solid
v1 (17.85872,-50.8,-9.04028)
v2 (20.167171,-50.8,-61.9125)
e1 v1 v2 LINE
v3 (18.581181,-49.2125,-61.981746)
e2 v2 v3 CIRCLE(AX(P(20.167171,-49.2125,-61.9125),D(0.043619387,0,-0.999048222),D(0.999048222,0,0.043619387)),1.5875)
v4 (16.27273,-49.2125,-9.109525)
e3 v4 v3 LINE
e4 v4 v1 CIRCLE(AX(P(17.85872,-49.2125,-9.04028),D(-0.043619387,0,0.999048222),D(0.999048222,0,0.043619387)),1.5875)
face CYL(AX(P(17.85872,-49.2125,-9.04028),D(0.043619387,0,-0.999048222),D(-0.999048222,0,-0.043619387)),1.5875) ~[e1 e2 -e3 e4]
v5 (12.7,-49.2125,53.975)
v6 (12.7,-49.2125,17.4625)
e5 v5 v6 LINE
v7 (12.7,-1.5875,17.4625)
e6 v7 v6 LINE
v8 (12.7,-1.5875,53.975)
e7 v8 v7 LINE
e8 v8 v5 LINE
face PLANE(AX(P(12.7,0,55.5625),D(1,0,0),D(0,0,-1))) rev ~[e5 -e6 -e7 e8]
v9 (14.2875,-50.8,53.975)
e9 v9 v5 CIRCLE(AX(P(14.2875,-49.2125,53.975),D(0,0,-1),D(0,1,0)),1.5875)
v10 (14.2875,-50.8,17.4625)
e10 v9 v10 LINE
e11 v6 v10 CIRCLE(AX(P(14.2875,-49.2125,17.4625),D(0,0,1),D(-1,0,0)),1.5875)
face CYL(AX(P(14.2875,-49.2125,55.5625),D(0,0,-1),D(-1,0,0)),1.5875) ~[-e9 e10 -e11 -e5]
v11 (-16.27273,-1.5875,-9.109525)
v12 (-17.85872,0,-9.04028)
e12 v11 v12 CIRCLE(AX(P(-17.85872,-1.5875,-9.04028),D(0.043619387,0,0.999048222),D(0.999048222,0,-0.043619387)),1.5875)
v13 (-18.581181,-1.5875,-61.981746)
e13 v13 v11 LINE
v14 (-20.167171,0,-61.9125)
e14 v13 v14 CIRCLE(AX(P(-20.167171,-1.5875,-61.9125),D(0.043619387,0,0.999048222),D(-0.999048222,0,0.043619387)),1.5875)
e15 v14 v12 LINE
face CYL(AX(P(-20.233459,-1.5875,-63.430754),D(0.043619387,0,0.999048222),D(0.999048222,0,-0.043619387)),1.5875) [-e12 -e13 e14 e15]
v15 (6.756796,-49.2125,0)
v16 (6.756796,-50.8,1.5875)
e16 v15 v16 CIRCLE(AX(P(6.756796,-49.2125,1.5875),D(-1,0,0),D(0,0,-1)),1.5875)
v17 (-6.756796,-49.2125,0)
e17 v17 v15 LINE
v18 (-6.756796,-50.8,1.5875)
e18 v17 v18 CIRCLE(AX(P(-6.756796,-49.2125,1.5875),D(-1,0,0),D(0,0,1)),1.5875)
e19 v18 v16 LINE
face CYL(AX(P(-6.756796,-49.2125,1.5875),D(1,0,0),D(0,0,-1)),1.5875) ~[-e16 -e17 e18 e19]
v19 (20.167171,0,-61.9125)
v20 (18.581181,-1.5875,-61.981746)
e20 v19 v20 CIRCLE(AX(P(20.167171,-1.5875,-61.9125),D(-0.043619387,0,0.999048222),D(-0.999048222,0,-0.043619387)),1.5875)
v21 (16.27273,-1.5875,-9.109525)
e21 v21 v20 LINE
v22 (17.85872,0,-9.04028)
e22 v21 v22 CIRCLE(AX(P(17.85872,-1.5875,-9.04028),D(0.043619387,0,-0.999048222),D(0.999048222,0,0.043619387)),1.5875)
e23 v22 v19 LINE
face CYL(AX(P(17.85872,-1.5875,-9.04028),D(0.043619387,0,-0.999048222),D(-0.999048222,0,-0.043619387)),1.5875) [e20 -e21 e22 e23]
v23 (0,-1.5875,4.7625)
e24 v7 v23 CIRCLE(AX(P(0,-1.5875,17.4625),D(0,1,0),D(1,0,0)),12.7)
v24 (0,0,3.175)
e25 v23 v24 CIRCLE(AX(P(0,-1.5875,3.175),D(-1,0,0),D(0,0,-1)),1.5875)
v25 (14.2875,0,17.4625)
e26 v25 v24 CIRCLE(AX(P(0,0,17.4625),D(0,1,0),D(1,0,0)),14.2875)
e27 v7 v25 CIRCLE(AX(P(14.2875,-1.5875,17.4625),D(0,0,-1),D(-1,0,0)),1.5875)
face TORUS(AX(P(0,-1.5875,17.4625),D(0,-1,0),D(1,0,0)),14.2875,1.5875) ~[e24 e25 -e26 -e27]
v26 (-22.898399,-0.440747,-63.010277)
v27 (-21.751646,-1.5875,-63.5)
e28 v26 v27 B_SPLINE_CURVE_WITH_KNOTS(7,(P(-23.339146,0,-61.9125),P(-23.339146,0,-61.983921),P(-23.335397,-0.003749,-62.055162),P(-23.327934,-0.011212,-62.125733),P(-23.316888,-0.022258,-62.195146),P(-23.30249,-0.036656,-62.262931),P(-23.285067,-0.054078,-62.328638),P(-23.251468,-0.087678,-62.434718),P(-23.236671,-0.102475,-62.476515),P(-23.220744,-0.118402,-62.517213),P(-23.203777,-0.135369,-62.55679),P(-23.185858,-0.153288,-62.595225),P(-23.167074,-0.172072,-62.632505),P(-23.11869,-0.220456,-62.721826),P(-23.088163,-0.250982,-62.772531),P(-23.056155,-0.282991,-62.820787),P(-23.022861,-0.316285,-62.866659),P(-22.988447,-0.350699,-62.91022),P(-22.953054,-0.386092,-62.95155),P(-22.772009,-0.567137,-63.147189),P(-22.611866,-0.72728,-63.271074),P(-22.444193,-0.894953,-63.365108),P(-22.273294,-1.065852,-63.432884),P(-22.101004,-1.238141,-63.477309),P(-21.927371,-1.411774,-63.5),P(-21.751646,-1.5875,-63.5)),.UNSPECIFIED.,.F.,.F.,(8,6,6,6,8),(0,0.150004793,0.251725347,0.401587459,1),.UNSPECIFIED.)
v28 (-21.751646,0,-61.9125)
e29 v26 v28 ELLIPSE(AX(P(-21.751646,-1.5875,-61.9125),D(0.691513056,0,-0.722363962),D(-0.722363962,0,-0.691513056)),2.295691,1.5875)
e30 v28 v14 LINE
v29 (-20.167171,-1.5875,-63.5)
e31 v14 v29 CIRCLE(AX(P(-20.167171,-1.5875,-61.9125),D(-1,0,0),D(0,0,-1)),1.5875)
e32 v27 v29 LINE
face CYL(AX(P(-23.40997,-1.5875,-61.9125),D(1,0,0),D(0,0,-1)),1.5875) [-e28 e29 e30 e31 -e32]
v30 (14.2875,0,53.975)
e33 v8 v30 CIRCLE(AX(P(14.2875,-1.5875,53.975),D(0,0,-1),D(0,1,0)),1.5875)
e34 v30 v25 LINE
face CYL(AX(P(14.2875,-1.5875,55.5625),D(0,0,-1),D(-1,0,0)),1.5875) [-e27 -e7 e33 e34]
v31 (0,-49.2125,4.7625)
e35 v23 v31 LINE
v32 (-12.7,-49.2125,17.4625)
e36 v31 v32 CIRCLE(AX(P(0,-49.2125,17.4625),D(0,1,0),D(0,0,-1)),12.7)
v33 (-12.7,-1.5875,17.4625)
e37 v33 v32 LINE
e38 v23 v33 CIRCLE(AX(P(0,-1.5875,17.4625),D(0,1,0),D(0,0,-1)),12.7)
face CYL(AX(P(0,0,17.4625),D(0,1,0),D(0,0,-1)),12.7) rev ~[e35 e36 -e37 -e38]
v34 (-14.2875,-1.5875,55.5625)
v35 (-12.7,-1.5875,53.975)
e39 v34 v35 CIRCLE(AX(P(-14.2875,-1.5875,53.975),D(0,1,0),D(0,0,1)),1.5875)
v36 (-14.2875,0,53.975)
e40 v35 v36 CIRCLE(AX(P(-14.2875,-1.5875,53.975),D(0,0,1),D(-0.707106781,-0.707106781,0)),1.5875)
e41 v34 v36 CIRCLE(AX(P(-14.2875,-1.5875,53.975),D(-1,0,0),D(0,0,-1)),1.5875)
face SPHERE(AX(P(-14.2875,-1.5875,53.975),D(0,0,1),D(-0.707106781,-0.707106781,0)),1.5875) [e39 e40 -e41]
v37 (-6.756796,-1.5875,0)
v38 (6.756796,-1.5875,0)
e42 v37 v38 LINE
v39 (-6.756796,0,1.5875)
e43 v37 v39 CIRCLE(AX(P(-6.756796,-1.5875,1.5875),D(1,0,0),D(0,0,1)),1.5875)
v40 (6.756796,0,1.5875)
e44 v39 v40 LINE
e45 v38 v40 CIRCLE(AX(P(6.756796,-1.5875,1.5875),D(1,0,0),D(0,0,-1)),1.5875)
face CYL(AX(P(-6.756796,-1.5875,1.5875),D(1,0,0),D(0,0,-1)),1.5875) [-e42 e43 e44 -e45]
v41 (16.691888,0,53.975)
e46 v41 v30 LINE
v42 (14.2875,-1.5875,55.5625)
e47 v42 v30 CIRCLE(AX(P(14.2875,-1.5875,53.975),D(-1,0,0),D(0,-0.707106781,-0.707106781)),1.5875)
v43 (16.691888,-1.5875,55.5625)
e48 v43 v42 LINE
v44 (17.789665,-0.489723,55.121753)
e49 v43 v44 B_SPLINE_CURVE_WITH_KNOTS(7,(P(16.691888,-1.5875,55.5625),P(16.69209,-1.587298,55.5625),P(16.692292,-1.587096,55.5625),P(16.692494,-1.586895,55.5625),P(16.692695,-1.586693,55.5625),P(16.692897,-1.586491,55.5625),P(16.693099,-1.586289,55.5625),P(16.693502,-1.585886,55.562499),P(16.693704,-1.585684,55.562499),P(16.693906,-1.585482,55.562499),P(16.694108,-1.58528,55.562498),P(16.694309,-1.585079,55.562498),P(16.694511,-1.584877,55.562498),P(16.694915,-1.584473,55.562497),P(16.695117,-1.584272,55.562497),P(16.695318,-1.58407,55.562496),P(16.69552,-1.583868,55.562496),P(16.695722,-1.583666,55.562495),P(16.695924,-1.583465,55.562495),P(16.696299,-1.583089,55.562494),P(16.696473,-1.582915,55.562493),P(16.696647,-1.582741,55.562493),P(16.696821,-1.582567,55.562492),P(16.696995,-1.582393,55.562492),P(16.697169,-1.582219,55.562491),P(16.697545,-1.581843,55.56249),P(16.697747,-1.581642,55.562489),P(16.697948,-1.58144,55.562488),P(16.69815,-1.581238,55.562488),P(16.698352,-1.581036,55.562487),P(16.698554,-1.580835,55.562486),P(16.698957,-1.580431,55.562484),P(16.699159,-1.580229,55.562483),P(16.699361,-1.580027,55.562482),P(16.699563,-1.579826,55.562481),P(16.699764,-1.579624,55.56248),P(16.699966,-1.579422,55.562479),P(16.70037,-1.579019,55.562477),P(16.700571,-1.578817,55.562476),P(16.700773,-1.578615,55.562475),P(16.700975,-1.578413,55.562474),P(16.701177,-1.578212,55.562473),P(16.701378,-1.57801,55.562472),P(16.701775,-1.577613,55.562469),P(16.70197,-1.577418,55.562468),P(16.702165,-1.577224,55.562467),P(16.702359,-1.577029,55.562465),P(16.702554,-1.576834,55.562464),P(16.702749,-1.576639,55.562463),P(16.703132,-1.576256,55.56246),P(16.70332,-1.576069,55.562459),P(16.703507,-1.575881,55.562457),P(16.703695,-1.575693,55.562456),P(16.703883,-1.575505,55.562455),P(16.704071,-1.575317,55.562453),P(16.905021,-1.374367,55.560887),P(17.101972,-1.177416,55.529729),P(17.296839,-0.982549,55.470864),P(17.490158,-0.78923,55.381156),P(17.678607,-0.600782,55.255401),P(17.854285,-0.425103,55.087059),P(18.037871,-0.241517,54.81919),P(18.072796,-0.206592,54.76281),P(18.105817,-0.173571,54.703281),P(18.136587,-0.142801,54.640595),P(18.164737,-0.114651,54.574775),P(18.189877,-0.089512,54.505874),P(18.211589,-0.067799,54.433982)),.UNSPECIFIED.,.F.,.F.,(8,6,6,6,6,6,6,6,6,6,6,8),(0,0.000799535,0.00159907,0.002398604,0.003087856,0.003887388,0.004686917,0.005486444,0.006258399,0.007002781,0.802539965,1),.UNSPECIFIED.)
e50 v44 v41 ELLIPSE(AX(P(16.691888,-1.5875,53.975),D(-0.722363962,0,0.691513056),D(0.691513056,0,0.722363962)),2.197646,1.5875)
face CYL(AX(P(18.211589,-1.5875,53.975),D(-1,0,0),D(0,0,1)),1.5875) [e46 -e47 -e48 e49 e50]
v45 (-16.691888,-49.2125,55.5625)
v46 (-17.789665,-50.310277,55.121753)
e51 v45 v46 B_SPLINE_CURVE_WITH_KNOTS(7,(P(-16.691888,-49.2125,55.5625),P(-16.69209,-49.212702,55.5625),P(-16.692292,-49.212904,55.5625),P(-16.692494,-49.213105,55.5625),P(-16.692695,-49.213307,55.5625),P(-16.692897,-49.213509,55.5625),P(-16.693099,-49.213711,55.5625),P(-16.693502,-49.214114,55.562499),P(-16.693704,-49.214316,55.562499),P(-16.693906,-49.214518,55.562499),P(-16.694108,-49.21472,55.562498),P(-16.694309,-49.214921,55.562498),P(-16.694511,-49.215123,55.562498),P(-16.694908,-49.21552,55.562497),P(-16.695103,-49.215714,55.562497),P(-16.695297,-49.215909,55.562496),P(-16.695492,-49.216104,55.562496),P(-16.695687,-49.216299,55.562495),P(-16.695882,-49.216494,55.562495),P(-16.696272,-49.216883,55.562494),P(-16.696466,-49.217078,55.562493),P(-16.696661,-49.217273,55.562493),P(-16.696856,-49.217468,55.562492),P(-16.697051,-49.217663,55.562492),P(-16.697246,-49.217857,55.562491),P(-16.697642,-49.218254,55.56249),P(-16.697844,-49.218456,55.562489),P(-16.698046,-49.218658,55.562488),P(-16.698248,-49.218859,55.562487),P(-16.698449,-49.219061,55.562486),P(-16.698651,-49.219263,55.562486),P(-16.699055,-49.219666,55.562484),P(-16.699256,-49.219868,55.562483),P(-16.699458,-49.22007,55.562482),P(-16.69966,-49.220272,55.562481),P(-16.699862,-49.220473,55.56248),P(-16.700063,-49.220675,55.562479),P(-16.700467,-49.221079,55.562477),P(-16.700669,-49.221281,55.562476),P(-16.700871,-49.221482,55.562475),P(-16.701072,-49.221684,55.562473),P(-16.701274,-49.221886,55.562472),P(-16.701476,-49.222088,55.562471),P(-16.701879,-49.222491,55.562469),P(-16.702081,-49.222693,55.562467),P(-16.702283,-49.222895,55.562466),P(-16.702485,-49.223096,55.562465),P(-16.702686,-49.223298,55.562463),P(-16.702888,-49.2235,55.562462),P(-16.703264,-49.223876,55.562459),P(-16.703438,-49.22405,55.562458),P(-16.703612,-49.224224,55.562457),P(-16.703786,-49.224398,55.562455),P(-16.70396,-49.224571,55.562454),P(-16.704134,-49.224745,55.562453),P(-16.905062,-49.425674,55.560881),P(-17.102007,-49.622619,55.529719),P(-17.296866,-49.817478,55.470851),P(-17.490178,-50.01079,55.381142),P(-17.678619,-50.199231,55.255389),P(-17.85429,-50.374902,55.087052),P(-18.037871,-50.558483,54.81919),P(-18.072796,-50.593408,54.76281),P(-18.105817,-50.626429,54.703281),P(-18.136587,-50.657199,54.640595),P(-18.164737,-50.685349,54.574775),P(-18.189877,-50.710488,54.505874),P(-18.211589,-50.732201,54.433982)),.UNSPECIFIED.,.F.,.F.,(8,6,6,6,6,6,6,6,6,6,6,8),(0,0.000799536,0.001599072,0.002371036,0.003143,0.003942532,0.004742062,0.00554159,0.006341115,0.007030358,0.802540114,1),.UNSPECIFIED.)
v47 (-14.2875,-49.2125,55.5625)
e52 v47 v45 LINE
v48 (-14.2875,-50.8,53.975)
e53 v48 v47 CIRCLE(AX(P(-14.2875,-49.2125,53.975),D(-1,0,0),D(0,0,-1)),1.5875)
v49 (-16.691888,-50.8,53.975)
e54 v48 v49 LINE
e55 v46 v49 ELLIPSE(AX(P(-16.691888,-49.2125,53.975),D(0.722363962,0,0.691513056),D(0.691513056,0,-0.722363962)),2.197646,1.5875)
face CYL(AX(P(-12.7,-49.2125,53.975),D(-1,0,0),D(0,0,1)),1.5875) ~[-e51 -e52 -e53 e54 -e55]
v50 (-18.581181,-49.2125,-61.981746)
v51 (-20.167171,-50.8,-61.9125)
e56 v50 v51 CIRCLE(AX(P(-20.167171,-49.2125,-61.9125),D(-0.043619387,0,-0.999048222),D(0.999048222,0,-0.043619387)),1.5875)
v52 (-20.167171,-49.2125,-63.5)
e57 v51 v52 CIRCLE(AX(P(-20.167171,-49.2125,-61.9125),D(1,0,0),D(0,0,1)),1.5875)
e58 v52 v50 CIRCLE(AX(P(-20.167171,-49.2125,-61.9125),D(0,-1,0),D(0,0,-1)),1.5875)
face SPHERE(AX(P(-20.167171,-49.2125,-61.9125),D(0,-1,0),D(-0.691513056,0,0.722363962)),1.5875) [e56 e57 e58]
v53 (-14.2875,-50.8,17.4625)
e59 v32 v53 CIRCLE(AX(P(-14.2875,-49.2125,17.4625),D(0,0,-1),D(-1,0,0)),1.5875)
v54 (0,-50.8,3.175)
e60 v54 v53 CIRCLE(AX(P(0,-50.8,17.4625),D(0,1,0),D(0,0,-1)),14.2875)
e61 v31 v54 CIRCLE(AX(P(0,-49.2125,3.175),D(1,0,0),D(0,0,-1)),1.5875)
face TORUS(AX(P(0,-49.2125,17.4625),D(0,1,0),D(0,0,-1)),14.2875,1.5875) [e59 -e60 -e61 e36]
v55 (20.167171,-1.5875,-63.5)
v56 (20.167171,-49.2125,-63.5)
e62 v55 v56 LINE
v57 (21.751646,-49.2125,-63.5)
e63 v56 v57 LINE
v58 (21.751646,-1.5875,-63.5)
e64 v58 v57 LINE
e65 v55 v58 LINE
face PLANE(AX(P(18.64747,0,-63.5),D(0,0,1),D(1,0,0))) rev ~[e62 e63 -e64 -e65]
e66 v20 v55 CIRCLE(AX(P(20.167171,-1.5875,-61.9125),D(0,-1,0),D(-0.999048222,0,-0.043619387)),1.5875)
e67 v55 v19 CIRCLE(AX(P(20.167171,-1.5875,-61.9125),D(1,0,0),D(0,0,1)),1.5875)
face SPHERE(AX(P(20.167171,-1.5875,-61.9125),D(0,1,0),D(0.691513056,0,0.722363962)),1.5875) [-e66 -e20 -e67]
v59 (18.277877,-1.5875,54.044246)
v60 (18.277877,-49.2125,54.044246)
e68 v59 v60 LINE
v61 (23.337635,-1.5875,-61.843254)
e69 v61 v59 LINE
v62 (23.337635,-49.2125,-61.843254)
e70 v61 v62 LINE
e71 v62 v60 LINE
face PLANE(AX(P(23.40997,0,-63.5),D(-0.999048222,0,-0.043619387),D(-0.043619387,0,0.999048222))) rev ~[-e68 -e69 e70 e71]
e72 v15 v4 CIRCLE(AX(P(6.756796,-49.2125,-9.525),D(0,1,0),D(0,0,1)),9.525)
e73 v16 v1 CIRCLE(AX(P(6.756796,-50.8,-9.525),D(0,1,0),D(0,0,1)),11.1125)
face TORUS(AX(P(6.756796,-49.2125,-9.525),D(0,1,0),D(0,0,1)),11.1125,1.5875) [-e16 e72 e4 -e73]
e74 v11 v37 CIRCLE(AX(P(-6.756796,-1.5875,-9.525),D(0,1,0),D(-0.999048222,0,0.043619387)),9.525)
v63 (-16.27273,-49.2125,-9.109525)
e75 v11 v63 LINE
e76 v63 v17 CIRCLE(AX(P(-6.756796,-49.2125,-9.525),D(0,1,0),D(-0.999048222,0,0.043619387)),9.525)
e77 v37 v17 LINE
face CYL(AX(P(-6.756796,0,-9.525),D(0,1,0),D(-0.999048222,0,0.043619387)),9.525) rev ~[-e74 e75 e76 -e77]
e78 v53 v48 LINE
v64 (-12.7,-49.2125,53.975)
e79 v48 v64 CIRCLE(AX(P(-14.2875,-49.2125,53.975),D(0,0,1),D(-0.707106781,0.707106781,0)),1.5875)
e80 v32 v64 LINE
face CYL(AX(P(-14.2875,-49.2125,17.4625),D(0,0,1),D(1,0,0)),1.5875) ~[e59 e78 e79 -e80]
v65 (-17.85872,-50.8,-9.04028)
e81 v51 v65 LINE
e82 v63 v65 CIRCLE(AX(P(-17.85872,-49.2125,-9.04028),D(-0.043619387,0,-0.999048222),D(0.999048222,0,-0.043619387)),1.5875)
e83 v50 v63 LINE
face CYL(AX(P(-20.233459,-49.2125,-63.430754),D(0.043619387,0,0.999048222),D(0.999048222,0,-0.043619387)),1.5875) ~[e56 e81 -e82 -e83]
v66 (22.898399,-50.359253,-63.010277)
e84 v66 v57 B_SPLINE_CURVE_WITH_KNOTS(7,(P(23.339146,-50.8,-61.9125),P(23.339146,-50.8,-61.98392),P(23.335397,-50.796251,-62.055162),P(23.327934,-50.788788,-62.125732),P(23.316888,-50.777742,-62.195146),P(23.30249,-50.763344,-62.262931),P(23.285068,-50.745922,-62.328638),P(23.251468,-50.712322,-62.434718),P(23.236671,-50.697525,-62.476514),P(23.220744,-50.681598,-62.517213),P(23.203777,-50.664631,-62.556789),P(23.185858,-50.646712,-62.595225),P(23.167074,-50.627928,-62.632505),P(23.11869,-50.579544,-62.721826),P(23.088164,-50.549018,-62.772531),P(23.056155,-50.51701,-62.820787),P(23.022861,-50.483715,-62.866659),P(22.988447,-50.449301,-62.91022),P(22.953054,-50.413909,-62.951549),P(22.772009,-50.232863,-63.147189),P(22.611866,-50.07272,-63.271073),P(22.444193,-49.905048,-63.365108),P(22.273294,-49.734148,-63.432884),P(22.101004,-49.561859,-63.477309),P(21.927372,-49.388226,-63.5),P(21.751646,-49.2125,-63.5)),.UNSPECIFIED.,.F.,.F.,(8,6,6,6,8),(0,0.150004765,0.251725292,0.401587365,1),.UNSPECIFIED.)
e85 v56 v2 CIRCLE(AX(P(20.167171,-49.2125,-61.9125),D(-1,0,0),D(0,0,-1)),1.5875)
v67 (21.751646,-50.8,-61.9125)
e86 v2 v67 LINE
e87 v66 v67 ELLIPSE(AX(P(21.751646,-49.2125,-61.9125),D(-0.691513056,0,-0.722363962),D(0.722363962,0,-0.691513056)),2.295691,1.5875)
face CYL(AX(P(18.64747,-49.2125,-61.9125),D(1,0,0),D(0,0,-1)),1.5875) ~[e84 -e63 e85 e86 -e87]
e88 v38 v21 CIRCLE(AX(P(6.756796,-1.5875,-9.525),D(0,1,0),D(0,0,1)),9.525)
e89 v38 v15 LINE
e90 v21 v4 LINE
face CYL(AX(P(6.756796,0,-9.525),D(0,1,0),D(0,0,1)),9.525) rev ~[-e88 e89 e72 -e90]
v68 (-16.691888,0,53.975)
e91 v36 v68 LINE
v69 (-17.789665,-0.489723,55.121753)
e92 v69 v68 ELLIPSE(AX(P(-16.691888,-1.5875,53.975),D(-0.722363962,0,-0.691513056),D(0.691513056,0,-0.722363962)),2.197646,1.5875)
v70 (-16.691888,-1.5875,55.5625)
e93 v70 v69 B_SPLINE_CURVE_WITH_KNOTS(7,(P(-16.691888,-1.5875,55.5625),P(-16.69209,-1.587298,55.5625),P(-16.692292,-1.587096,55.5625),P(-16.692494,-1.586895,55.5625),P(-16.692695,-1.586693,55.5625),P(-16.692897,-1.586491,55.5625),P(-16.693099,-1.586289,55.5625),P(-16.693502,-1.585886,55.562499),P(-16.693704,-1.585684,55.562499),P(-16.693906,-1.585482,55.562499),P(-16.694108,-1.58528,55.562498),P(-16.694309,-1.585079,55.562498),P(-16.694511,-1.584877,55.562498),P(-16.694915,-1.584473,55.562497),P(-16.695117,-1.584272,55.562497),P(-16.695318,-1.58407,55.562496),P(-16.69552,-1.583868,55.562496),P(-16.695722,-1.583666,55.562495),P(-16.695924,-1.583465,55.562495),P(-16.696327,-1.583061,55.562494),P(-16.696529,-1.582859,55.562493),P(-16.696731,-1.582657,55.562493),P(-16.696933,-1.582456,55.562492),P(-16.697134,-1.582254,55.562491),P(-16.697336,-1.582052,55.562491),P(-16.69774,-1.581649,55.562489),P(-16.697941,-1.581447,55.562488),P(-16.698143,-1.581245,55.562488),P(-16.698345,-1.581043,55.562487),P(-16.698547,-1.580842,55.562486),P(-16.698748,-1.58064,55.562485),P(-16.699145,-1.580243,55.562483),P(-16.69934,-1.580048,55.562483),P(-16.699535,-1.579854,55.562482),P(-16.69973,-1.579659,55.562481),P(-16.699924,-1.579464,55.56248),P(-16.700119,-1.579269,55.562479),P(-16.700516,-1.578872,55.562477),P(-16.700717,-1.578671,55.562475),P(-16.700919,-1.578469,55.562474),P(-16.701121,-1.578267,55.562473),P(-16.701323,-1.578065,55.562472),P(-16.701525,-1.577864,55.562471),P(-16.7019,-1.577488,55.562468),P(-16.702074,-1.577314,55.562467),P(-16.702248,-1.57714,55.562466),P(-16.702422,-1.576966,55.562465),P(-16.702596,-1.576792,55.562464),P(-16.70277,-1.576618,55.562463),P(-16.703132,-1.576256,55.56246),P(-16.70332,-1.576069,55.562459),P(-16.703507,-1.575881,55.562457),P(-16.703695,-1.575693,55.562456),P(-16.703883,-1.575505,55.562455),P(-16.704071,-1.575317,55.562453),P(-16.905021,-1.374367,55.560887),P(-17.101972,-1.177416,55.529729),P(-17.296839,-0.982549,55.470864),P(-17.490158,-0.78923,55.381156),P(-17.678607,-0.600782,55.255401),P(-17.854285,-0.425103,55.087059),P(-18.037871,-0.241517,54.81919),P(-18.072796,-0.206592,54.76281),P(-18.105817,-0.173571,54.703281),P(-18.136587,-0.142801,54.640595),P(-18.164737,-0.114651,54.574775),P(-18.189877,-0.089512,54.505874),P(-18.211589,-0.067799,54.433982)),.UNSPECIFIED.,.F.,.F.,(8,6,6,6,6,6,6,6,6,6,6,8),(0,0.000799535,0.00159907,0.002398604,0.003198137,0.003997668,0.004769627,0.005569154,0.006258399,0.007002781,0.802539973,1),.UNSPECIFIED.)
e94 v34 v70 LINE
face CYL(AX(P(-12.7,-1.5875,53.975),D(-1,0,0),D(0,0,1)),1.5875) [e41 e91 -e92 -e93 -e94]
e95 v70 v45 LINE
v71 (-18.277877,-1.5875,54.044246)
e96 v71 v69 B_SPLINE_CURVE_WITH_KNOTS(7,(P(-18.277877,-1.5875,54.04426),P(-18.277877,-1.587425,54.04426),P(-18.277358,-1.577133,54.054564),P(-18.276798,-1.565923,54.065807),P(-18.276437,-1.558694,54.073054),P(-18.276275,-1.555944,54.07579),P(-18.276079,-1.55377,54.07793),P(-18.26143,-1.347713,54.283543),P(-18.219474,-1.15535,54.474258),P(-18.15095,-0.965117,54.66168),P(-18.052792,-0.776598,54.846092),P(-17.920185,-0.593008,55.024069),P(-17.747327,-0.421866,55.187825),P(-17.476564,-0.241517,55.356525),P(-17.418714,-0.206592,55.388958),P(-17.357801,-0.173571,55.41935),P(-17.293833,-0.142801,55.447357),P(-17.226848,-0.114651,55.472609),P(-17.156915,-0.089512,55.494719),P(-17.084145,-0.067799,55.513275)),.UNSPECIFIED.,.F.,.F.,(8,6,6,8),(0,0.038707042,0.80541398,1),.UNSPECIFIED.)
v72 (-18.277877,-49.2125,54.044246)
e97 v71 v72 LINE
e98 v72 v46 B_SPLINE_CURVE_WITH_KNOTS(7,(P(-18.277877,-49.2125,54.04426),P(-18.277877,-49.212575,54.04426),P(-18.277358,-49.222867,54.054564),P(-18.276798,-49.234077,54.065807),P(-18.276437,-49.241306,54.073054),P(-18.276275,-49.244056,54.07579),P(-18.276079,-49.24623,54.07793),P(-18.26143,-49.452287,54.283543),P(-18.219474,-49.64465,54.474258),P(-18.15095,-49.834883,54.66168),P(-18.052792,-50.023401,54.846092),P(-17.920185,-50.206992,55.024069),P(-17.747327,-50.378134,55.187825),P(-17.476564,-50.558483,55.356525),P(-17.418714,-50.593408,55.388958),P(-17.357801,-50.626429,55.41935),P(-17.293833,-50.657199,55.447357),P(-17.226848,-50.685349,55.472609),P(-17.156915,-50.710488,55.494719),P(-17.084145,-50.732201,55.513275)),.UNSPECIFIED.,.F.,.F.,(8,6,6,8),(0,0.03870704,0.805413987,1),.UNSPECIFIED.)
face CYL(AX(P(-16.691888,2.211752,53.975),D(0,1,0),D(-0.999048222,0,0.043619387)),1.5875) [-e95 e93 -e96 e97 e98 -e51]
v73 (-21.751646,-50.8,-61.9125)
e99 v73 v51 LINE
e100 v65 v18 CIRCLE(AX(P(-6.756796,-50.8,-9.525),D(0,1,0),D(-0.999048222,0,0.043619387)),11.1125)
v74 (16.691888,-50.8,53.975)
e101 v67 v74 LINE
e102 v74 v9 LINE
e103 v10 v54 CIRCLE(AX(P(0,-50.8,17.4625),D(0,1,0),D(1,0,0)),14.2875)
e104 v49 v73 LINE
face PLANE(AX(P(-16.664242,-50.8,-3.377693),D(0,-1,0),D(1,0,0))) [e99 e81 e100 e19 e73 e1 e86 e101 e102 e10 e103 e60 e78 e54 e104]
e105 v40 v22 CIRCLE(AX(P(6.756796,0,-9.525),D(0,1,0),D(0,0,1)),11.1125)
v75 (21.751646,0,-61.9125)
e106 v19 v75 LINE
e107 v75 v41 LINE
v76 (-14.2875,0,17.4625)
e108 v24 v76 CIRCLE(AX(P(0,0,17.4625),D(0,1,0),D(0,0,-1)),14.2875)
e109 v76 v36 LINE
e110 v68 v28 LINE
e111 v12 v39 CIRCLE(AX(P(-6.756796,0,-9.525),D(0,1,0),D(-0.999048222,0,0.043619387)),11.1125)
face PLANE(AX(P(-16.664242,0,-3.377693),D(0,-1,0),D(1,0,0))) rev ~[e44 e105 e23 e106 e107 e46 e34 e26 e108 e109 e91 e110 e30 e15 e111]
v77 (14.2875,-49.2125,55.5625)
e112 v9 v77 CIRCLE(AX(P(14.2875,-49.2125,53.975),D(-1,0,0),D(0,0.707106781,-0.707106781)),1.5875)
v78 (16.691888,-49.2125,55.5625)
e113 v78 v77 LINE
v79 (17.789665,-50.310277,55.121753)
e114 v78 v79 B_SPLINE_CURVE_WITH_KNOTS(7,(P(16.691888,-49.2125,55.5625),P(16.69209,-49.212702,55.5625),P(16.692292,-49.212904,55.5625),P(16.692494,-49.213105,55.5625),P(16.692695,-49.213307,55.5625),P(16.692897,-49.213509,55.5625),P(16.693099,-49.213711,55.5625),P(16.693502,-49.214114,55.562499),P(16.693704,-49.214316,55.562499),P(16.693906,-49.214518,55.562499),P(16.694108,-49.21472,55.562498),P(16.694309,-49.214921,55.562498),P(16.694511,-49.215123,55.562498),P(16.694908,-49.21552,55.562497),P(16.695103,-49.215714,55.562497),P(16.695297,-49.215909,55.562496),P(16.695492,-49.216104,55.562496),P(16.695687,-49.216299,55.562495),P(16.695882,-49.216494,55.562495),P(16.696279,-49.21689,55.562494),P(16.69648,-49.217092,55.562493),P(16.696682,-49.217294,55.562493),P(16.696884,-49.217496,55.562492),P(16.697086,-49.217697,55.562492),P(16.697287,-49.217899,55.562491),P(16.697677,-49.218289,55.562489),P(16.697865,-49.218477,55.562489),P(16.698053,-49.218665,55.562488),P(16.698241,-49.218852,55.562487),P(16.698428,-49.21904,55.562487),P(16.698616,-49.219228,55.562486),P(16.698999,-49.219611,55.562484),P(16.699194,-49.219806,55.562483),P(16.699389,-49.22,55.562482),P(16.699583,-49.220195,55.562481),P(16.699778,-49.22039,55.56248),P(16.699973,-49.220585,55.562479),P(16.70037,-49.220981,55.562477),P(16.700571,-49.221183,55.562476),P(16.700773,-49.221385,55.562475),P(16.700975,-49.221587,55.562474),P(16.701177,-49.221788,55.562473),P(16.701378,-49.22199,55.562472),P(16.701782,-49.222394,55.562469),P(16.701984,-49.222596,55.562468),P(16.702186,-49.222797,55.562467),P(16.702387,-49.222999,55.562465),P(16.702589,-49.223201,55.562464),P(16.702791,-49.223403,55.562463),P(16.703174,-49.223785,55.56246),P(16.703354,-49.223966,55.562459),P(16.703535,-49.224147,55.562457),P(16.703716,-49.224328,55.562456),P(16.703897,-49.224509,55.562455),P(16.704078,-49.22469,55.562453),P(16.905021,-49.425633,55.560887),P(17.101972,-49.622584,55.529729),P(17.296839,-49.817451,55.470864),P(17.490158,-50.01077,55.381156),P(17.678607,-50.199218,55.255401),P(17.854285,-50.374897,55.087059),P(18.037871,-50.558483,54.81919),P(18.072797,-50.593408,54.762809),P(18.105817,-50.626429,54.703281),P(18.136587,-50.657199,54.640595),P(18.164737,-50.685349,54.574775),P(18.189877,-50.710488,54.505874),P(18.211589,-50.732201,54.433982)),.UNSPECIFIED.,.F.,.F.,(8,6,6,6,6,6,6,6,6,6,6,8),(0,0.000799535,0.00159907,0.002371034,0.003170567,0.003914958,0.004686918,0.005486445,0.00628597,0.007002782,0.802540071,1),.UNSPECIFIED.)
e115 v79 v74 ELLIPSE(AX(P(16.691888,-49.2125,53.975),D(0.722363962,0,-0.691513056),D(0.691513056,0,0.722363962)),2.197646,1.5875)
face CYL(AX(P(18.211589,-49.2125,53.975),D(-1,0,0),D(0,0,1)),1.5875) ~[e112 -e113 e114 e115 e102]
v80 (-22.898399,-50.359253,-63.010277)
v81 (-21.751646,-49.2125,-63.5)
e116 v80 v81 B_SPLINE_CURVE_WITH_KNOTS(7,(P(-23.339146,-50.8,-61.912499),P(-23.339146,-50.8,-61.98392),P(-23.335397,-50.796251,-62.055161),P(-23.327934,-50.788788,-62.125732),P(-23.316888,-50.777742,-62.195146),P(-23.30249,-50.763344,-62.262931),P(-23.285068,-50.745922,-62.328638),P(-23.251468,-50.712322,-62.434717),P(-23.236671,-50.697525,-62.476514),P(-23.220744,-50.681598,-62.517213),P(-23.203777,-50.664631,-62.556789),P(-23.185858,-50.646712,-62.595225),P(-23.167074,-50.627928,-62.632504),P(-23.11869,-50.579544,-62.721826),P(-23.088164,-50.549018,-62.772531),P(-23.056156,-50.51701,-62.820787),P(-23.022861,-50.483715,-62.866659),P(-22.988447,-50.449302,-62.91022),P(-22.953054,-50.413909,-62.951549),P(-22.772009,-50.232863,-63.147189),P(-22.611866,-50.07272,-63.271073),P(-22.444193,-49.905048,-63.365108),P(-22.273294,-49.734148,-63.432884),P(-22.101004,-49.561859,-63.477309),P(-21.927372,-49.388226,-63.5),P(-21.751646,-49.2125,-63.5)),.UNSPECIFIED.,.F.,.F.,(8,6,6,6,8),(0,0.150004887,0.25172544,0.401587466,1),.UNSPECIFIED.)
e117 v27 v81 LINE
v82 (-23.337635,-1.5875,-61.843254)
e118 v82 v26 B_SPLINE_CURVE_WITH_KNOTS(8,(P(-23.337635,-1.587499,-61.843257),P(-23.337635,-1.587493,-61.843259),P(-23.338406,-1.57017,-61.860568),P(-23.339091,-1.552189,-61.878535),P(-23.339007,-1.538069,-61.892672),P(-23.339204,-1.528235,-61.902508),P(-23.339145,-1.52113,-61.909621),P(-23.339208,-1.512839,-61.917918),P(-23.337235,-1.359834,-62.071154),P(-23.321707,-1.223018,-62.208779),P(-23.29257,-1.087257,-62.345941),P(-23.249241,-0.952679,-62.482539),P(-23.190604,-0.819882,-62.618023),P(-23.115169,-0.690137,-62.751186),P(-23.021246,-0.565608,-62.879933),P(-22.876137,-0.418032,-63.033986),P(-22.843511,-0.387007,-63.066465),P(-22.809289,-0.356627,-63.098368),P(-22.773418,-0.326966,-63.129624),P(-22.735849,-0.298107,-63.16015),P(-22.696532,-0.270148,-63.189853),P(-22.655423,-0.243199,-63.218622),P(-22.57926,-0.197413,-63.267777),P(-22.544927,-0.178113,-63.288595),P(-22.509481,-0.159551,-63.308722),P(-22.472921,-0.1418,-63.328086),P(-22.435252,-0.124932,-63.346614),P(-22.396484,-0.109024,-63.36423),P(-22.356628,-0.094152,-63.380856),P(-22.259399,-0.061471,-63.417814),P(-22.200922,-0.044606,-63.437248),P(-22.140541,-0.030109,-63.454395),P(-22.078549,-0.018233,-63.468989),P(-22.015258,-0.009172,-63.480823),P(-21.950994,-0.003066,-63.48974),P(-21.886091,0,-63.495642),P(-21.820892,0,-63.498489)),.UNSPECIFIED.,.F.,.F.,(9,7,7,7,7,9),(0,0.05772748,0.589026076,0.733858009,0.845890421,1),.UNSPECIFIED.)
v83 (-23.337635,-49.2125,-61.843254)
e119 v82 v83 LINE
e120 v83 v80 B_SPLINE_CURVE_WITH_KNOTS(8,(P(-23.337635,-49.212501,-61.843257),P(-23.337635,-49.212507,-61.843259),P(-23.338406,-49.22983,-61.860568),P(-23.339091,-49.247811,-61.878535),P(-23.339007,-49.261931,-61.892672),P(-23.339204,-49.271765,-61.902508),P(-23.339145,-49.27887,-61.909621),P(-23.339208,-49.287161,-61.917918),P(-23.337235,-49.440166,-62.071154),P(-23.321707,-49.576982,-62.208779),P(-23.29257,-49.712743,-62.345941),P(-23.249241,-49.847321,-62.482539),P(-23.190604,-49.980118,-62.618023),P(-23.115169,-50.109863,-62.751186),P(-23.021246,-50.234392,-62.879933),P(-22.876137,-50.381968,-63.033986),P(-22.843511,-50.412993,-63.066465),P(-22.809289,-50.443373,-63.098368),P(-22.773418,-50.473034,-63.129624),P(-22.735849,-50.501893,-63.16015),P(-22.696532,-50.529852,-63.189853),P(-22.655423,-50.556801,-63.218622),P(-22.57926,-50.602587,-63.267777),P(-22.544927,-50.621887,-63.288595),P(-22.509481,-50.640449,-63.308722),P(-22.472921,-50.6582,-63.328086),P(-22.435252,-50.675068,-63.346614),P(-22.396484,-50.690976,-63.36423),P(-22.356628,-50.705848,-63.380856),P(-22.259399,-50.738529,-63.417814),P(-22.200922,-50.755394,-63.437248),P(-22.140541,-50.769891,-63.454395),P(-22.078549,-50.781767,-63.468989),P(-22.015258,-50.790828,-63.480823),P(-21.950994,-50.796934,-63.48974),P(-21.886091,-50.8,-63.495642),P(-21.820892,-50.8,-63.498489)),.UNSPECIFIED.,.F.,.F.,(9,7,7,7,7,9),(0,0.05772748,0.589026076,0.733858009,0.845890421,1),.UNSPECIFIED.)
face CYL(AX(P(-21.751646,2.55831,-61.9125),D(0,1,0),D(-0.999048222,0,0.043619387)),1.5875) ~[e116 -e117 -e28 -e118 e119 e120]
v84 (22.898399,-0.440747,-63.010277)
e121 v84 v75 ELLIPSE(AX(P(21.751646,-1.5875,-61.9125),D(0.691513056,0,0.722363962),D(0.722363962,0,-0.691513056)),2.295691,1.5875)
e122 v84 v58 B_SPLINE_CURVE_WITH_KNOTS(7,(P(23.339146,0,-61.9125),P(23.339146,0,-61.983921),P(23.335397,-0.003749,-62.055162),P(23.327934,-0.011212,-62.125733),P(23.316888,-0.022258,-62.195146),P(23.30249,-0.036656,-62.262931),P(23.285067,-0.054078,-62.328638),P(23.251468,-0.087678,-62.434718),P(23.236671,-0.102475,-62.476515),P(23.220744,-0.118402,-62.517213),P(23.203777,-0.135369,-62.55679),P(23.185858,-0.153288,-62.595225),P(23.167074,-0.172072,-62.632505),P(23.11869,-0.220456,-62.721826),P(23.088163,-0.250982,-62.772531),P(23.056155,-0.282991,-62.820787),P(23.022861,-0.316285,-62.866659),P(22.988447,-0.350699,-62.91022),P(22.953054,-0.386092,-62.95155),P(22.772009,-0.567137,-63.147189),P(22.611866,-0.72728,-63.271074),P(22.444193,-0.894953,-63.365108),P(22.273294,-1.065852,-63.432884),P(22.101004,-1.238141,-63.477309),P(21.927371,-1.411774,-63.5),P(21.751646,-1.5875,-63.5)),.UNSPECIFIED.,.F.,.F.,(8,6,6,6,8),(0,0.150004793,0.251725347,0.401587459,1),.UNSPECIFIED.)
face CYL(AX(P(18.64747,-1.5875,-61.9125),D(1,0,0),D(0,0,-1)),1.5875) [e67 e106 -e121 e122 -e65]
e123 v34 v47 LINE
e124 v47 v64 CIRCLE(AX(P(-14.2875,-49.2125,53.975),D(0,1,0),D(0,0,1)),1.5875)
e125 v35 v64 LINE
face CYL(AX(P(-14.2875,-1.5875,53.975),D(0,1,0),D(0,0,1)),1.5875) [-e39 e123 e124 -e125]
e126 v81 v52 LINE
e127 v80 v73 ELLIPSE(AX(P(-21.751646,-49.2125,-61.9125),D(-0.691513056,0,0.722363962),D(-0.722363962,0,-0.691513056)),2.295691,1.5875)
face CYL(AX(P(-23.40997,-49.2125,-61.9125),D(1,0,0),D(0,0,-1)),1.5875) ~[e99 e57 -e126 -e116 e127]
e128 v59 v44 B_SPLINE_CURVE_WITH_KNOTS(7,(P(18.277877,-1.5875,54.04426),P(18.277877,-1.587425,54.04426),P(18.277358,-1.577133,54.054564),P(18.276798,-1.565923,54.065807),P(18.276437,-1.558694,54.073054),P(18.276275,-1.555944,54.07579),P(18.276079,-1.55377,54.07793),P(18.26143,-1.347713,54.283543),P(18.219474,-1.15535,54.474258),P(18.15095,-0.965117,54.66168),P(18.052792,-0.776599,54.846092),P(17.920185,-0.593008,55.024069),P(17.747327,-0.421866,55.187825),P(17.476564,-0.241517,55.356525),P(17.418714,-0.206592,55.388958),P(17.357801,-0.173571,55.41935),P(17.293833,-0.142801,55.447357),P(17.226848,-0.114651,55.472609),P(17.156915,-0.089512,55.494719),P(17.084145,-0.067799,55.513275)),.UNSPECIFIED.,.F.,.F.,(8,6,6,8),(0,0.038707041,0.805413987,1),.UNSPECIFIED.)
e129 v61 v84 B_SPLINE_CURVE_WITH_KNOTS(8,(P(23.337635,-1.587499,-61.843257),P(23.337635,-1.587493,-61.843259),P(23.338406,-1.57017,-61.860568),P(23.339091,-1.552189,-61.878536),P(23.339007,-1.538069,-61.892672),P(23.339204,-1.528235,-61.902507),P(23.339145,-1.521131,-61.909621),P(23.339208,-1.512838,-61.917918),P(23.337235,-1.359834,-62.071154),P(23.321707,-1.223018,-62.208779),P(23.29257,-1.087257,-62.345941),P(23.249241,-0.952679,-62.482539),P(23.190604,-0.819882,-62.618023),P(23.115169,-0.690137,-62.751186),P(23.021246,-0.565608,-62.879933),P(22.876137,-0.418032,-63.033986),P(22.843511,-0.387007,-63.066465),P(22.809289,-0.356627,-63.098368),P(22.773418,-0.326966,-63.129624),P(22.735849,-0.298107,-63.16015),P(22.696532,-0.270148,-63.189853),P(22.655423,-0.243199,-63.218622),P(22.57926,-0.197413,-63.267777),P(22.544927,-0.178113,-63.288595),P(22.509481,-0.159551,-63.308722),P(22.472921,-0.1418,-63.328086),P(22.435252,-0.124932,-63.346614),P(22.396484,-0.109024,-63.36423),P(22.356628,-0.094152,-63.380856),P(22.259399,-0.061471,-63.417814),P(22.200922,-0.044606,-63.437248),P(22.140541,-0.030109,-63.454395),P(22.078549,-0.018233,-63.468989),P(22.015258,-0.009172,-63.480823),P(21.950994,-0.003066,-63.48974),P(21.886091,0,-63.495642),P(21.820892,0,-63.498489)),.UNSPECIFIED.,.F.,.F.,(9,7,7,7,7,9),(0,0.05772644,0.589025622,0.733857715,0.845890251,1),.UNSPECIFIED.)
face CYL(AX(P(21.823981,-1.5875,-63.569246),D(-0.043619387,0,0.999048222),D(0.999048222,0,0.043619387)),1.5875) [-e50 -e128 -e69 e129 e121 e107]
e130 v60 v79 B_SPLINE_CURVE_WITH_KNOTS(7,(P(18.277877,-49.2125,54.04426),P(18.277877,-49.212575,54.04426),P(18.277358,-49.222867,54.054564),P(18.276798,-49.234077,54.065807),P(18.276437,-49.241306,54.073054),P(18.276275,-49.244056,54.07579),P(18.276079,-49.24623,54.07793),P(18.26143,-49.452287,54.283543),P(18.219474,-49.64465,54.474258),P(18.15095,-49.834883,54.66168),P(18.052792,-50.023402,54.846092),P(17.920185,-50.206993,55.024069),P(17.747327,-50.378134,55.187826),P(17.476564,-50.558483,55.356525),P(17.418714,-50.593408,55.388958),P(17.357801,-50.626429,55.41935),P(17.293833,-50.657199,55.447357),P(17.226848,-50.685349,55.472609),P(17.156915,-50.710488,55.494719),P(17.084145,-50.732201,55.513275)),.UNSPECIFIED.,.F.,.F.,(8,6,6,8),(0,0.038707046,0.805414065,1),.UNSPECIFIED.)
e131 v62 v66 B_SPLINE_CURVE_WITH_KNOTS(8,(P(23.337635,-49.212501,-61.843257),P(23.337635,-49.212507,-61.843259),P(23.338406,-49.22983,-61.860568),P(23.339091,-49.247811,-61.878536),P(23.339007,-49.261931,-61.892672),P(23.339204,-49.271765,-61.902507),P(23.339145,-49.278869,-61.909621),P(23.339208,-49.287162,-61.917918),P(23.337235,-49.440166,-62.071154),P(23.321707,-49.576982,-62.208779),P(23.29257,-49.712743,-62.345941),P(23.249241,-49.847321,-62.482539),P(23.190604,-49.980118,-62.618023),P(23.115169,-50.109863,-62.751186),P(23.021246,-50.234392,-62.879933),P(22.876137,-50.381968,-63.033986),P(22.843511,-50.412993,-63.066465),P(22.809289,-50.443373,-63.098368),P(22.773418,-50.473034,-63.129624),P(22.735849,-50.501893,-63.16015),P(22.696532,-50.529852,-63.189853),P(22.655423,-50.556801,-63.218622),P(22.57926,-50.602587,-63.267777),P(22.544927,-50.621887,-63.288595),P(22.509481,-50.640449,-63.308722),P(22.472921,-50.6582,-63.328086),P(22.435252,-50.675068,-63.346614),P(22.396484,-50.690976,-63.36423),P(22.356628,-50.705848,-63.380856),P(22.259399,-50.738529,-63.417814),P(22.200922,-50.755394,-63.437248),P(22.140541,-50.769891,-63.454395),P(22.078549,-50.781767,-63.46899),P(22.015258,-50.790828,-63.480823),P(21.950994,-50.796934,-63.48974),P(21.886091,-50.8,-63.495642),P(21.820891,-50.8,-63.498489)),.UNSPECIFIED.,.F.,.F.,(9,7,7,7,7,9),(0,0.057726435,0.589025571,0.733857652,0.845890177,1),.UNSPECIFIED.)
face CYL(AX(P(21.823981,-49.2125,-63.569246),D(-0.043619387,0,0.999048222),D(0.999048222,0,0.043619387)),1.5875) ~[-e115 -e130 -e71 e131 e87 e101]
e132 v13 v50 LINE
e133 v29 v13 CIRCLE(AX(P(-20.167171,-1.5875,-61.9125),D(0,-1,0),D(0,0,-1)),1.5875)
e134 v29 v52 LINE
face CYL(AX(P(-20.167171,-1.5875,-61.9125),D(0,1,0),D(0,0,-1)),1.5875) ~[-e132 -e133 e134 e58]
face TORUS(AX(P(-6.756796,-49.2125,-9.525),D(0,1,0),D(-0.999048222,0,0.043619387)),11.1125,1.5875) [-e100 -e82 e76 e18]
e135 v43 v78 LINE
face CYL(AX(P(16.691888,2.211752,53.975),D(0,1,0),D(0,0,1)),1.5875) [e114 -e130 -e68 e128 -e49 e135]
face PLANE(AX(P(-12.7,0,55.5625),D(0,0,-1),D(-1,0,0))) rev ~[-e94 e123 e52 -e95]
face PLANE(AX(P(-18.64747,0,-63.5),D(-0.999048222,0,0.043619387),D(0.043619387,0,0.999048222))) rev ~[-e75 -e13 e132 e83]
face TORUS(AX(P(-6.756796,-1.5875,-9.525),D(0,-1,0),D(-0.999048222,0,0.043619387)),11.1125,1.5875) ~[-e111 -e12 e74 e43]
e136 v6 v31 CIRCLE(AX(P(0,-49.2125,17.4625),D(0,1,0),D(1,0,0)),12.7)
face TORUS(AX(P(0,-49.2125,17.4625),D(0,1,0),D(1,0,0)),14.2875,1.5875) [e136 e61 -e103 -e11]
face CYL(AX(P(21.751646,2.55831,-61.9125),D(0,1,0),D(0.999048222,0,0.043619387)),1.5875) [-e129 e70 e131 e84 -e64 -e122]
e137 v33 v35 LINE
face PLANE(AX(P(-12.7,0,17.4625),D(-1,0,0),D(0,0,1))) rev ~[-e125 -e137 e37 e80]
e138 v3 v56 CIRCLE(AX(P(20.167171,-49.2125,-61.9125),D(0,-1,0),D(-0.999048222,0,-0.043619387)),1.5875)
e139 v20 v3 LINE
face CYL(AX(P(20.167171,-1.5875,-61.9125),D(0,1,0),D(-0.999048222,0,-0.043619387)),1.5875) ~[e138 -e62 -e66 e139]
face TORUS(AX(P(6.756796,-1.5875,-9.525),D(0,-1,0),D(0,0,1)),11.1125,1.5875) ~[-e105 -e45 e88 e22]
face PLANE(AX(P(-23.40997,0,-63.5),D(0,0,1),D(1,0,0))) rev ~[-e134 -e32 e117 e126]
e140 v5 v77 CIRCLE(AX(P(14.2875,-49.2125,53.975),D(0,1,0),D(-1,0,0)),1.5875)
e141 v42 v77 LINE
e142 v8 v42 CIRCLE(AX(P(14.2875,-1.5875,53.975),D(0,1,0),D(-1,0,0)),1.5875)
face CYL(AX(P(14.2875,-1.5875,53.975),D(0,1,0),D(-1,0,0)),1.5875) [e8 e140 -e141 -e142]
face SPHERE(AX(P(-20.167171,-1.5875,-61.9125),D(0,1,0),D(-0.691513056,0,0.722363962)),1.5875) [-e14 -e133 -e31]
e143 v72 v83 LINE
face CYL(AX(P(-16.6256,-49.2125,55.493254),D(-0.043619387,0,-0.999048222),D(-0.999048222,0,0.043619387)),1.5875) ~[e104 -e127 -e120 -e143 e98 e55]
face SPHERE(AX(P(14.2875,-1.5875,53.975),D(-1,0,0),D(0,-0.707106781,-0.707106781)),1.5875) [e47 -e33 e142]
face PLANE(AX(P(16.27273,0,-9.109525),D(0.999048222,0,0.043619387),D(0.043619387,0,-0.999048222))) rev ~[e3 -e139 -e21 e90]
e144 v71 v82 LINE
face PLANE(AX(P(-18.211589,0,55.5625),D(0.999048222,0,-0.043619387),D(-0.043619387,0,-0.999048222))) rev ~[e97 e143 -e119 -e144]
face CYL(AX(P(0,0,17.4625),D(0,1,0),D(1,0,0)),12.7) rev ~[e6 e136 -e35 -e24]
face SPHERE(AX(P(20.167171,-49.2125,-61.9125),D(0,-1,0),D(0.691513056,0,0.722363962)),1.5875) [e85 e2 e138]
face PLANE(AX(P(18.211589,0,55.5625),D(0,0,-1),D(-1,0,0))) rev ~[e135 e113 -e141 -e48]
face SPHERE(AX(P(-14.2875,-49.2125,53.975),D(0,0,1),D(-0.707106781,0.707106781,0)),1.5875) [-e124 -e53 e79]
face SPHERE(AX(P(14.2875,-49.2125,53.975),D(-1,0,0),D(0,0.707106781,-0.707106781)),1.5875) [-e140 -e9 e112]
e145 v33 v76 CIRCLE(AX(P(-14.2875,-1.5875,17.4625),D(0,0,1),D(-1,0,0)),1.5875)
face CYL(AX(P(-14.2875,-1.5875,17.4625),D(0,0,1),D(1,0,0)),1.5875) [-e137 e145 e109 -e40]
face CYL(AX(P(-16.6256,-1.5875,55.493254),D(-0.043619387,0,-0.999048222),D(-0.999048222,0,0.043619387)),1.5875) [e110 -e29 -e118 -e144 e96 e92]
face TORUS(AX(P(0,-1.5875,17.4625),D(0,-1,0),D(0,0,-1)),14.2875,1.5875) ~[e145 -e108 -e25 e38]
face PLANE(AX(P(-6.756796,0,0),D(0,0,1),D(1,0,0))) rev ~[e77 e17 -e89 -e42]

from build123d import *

# Parameters (mm, degrees)
F1_DEPTH     = 50.8
F2_R         = 1.5875
F3_T1_DEPTH  = 55.2235032041
F3_T3_DEPTH  = 55.9166206728
F4_T1_DEPTH  = 47.625
F4_T6_DEPTH  = 1.5875
F4_T12_DEPTH = 1.5875
F4_T18_DEPTH = 1.5875
F4_T24_DEPTH = 1.5875
F4_S29_W     = 1.5875
F4_S29_H     = 1.5875
F4_T30_DEPTH = 1.5875
F4_S35_W     = 1.5875
F4_S35_H     = 1.5875
F4_T36_DEPTH = 1.5875
F4_S41_W     = 1.5875
F4_S41_H     = 1.5875
F4_T42_DEPTH = 1.5875
F4_S47_W     = 1.5875
F4_S47_H     = 1.5875
F4_T48_DEPTH = 1.5875


# Not quite as in the source:
# - a fillet or chamfer that OpenCascade refuses, or shapes differently, is made with other operations: its cross-section is extruded or revolved along the edge and cut away or added


with BuildPart() as f1:
    # F0 (on Front) → F1 (new body)
    with BuildSketch(Plane.XZ):
        with BuildLine():
            Line((-18.2115888596, 55.5625), (-23.4099698747, -63.5))
            Line((-23.4099698747, -63.5), (-18.6474698747, -63.5))
            Line((-18.6474698747, -63.5), (-16.2727304656, -9.1095253353))
            ThreePointArc((-16.2727304656, -9.1095253353), (-13.3434580113, -2.6444832614), (-6.756796155, 0))
            Line((-6.756796155, 0), (0, 0))
            Line((0, 0), (0, 4.7625))
            ThreePointArc((0, 4.7625), (-8.9802561211, 8.4822438789), (-12.7, 17.4625))
            Line((-12.7, 17.4625), (-12.7, 55.5625))
            Line((-12.7, 55.5625), (-18.2115888596, 55.5625))
        make_face()
        with BuildLine():
            Line((0, 4.7625), (0, 0))
            Line((0, 0), (6.756796155, 0))
            ThreePointArc((6.756796155, 0), (13.3434580113, -2.6444832614), (16.2727304656, -9.1095253353))
            Line((16.2727304656, -9.1095253353), (18.6474698747, -63.5))
            Line((18.6474698747, -63.5), (23.4099698747, -63.5))
            Line((23.4099698747, -63.5), (18.2115888596, 55.5625))
            Line((18.2115888596, 55.5625), (12.7, 55.5625))
            Line((12.7, 55.5625), (12.7, 17.4625))
            ThreePointArc((12.7, 17.4625), (8.9802561211, 8.4822438789), (0, 4.7625))
        make_face()
    extrude(amount=F1_DEPTH)

    # F2
    f2_edges = [f1.edges().sort_by_distance(p)[0] for p in [
        (-20.810779, -50.8, -3.96875),
        (-21.02872, -50.8, -63.5),
        (-17.4601, -50.8, -36.304763),
        (-13.343458, -50.8, -2.644483),
        (0, -50.8, 0),
        (13.343458, -50.8, -2.644483),
        (17.4601, -50.8, -36.304763),
        (21.02872, -50.8, -63.5),
        (20.810779, -50.8, -3.96875),
        (15.455794, -50.8, 55.5625),
        (12.7, -50.8, 36.5125),
        (0, -50.8, 4.7625),
        (-12.7, -50.8, 36.5125),
        (-15.455794, -50.8, 55.5625),
        (-20.810779, 0, -3.96875),
        (-21.02872, 0, -63.5),
        (-17.4601, 0, -36.304763),
        (-13.343458, 0, -2.644483),
        (0, 0, 0),
        (13.343458, 0, -2.644483),
        (17.4601, 0, -36.304763),
        (21.02872, 0, -63.5),
        (20.810779, 0, -3.96875),
        (15.455794, 0, 55.5625),
        (12.7, 0, 36.5125),
        (0, 0, 4.7625),
        (-12.7, 0, 36.5125),
        (-15.455794, 0, 55.5625),
    ]]
    fillet(f2_edges, radius=F2_R)

    # F3: fillet of radius 1.5875 on 8 edges, made by hand

    # F3_s2 → F3_t1 (cut)
    with BuildSketch(Plane.XZ.offset(-2.2117516021)):
        with BuildLine():
            ThreePointArc((-18.2778772706, 54.0442457774), (-17.7896651949, 55.1217527898), (-16.6918882188, 55.5625))
            Line((-16.6918882188, 55.5625), (-18.2115888596, 55.5625))
            Line((-18.2115888596, 55.5625), (-18.2778772706, 54.0442457774))
        make_face()
        with BuildLine():
            ThreePointArc((16.6918882188, 55.5625), (17.7896651949, 55.1217527898), (18.2778772706, 54.0442457774))
            Line((18.2778772706, 54.0442457774), (18.2115888596, 55.5625))
            Line((18.2115888596, 55.5625), (16.6918882188, 55.5625))
        make_face()
    extrude(amount=F3_T1_DEPTH, mode=Mode.SUBTRACT)

    # F3_s4 → F3_t3 (cut)
    with BuildSketch(Plane.XZ.offset(-2.5583103364)):
        with BuildLine():
            ThreePointArc((-23.3376347919, -61.8432542226), (-22.8983985299, -63.0102769761), (-21.7516457401, -63.5))
            Line((-21.7516457401, -63.5), (-23.4099698747, -63.5))
            Line((-23.4099698747, -63.5), (-23.3376347919, -61.8432542226))
        make_face()
        with BuildLine():
            ThreePointArc((23.3376347919, -61.8432542226), (22.8983985299, -63.0102769761), (21.7516457401, -63.5))
            Line((21.7516457401, -63.5), (23.4099698747, -63.5))
            Line((23.4099698747, -63.5), (23.3376347919, -61.8432542226))
        make_face()
    extrude(amount=F3_T3_DEPTH, mode=Mode.SUBTRACT)

    # F4: fillet of radius 1.5875 on 4 edges, made by hand

    # F4_s2 → F4_t1 (cut)
    with BuildSketch(Plane.XZ.offset(1.5875)):
        with BuildLine():
            ThreePointArc((-14.2875, 55.5625), (-13.1649679849, 55.0975320151), (-12.7, 53.975))
            Line((-12.7, 53.975), (-12.7, 55.5625))
            Line((-12.7, 55.5625), (-14.2875, 55.5625))
        make_face()
        with BuildLine():
            ThreePointArc((12.7, 53.975), (13.1649679849, 55.0975320151), (14.2875, 55.5625))
            Line((14.2875, 55.5625), (12.7, 55.5625))
            Line((12.7, 55.5625), (12.7, 53.975))
        make_face()
        with BuildLine():
            ThreePointArc((-20.1671705155, -63.5), (-19.0693935395, -63.0592527898), (-18.5811814638, -61.9817457774))
            Line((-18.5811814638, -61.9817457774), (-18.6474698747, -63.5))
            Line((-18.6474698747, -63.5), (-20.1671705155, -63.5))
        make_face()
        with BuildLine():
            ThreePointArc((18.5811814638, -61.9817457774), (19.0693935395, -63.0592527898), (20.1671705155, -63.5))
            Line((20.1671705155, -63.5), (18.6474698747, -63.5))
            Line((18.6474698747, -63.5), (18.5811814638, -61.9817457774))
        make_face()
    extrude(amount=F4_T1_DEPTH, mode=Mode.SUBTRACT)


with BuildPart() as f4_tool4:
    # F4_s5 → F4_t6 (new body)
    with BuildSketch(Plane.XZ.offset(1.5875)):
        Polygon((20.1671705155, -61.9125), (18.5811814638, -61.9817457774), (18.6474698747, -63.5), (20.1671705155, -63.5), align=None)
    extrude(amount=-F4_T6_DEPTH)

    # F4_s7 → F4_t8 (revolve, cut)
    with BuildSketch(Plane(origin=(20.1671705155, -1.5875, -61.9125), x_dir=(0.6915130558, 0, 0.7223639621), z_dir=(-0.7223639621, 0, 0.6915130558))):
        with BuildLine():
            ThreePointArc((0, -1.5875), (1.5875, 0), (0, 1.5875))
            Line((0, 1.5875), (0, -1.5875))
        make_face()
    revolve(axis=Axis((20.1671705155, -1.5875, -61.9125), (0, 1, 0)), mode=Mode.SUBTRACT)


with BuildPart() as f1_1:
    add(f1.part)

    # F4_t3: cut F4_tool4
    add(f4_tool4.part, mode=Mode.SUBTRACT)


with BuildPart() as f4_tool10:
    # F4_s11 → F4_t12 (new body)
    with BuildSketch(Plane.XZ.offset(49.2125)):
        Polygon((20.1671705155, -61.9125), (18.5811814638, -61.9817457774), (18.6474698747, -63.5), (20.1671705155, -63.5), align=None)
    extrude(amount=F4_T12_DEPTH)

    # F4_s13 → F4_t14 (revolve, cut)
    with BuildSketch(Plane(origin=(20.1671705155, -49.2125, -61.9125), x_dir=(0.6915130558, 0, 0.7223639621), z_dir=(0.7223639621, 0, -0.6915130558))):
        with BuildLine():
            ThreePointArc((0, -1.5875), (1.5875, 0), (0, 1.5875))
            Line((0, 1.5875), (0, -1.5875))
        make_face()
    revolve(axis=Axis((20.1671705155, -49.2125, -61.9125), (0, -1, 0)), mode=Mode.SUBTRACT)


with BuildPart() as f1_2:
    add(f1_1.part)

    # F4_t9: cut F4_tool10
    add(f4_tool10.part, mode=Mode.SUBTRACT)


with BuildPart() as f4_tool16:
    # F4_s17 → F4_t18 (new body)
    with BuildSketch(Plane.XZ.offset(1.5875)):
        Polygon((-20.1671705155, -61.9125), (-20.1671705155, -63.5), (-18.6474698747, -63.5), (-18.5811814638, -61.9817457774), align=None)
    extrude(amount=-F4_T18_DEPTH)

    # F4_s19 → F4_t20 (revolve, cut)
    with BuildSketch(Plane(origin=(-20.1671705155, -1.5875, -61.9125), x_dir=(-0.6915130558, 0, 0.7223639621), z_dir=(-0.7223639621, 0, -0.6915130558))):
        with BuildLine():
            ThreePointArc((0, -1.5875), (1.5875, 0), (0, 1.5875))
            Line((0, 1.5875), (0, -1.5875))
        make_face()
    revolve(axis=Axis((-20.1671705155, -1.5875, -61.9125), (0, 1, 0)), mode=Mode.SUBTRACT)


with BuildPart() as f1_3:
    add(f1_2.part)

    # F4_t15: cut F4_tool16
    add(f4_tool16.part, mode=Mode.SUBTRACT)


with BuildPart() as f4_tool22:
    # F4_s23 → F4_t24 (new body)
    with BuildSketch(Plane.XZ.offset(49.2125)):
        Polygon((-20.1671705155, -61.9125), (-20.1671705155, -63.5), (-18.6474698747, -63.5), (-18.5811814638, -61.9817457774), align=None)
    extrude(amount=F4_T24_DEPTH)

    # F4_s25 → F4_t26 (revolve, cut)
    with BuildSketch(Plane(origin=(-20.1671705155, -49.2125, -61.9125), x_dir=(-0.6915130558, 0, 0.7223639621), z_dir=(0.7223639621, 0, 0.6915130558))):
        with BuildLine():
            ThreePointArc((0, -1.5875), (1.5875, 0), (0, 1.5875))
            Line((0, 1.5875), (0, -1.5875))
        make_face()
    revolve(axis=Axis((-20.1671705155, -49.2125, -61.9125), (0, -1, 0)), mode=Mode.SUBTRACT)


with BuildPart() as f1_4:
    add(f1_3.part)

    # F4_t21: cut F4_tool22
    add(f4_tool22.part, mode=Mode.SUBTRACT)


with BuildPart() as f4_tool28:
    # F4_s29 → F4_t30 (new body)
    with BuildSketch(Plane.YZ.offset(14.2875)):
        with Locations((-0.79375, 54.76875)):
            Rectangle(F4_S29_W, F4_S29_H)
    extrude(amount=-F4_T30_DEPTH)

    # F4_s31 → F4_t32 (revolve, cut)
    with BuildSketch(Plane(origin=(14.2875, -1.5875, 53.975), x_dir=(0, -0.7071067812, -0.7071067812), z_dir=(0, 0.7071067812, -0.7071067812))):
        with BuildLine():
            ThreePointArc((0, -1.5875), (1.5875, 0), (0, 1.5875))
            Line((0, 1.5875), (0, -1.5875))
        make_face()
    revolve(axis=Axis((14.2875, -1.5875, 53.975), (-1, 0, 0)), mode=Mode.SUBTRACT)


with BuildPart() as f1_5:
    add(f1_4.part)

    # F4_t27: cut F4_tool28
    add(f4_tool28.part, mode=Mode.SUBTRACT)


with BuildPart() as f4_tool34:
    # F4_s35 → F4_t36 (new body)
    with BuildSketch(Plane.YZ.offset(14.2875)):
        with Locations((-50.00625, 54.76875)):
            Rectangle(F4_S35_W, F4_S35_H)
    extrude(amount=-F4_T36_DEPTH)

    # F4_s37 → F4_t38 (revolve, cut)
    with BuildSketch(Plane(origin=(14.2875, -49.2125, 53.975), x_dir=(0, 0.7071067812, -0.7071067812), z_dir=(0, 0.7071067812, 0.7071067812))):
        with BuildLine():
            ThreePointArc((0, -1.5875), (1.5875, 0), (0, 1.5875))
            Line((0, 1.5875), (0, -1.5875))
        make_face()
    revolve(axis=Axis((14.2875, -49.2125, 53.975), (-1, 0, 0)), mode=Mode.SUBTRACT)


with BuildPart() as f1_6:
    add(f1_5.part)

    # F4_t33: cut F4_tool34
    add(f4_tool34.part, mode=Mode.SUBTRACT)


with BuildPart() as f4_tool40:
    # F4_s41 → F4_t42 (new body)
    with BuildSketch(Plane.XY.offset(53.975)):
        with Locations((-13.49375, -0.79375)):
            Rectangle(F4_S41_W, F4_S41_H)
    extrude(amount=F4_T42_DEPTH)

    # F4_s43 → F4_t44 (revolve, cut)
    with BuildSketch(Plane(origin=(-14.2875, -1.5875, 53.975), x_dir=(-0.7071067812, -0.7071067812, 0), z_dir=(-0.7071067812, 0.7071067812, 0))):
        with BuildLine():
            ThreePointArc((0, -1.5875), (1.5875, 0), (0, 1.5875))
            Line((0, 1.5875), (0, -1.5875))
        make_face()
    revolve(axis=Axis((-14.2875, -1.5875, 53.975), (0, 0, 1)), mode=Mode.SUBTRACT)


with BuildPart() as f1_7:
    add(f1_6.part)

    # F4_t39: cut F4_tool40
    add(f4_tool40.part, mode=Mode.SUBTRACT)


with BuildPart() as f4_tool46:
    # F4_s47 → F4_t48 (new body)
    with BuildSketch(Plane.XY.offset(53.975)):
        with Locations((-13.49375, -50.00625)):
            Rectangle(F4_S47_W, F4_S47_H)
    extrude(amount=F4_T48_DEPTH)

    # F4_s49 → F4_t50 (revolve, cut)
    with BuildSketch(Plane(origin=(-14.2875, -49.2125, 53.975), x_dir=(-0.7071067812, 0.7071067812, 0), z_dir=(0.7071067812, 0.7071067812, 0))):
        with BuildLine():
            ThreePointArc((0, -1.5875), (1.5875, 0), (0, 1.5875))
            Line((0, 1.5875), (0, -1.5875))
        make_face()
    revolve(axis=Axis((-14.2875, -49.2125, 53.975), (0, 0, 1)), mode=Mode.SUBTRACT)


with BuildPart() as f1_8:
    add(f1_7.part)

    # F4_t45: cut F4_tool46
    add(f4_tool46.part, mode=Mode.SUBTRACT)


solid = f1_8.part
